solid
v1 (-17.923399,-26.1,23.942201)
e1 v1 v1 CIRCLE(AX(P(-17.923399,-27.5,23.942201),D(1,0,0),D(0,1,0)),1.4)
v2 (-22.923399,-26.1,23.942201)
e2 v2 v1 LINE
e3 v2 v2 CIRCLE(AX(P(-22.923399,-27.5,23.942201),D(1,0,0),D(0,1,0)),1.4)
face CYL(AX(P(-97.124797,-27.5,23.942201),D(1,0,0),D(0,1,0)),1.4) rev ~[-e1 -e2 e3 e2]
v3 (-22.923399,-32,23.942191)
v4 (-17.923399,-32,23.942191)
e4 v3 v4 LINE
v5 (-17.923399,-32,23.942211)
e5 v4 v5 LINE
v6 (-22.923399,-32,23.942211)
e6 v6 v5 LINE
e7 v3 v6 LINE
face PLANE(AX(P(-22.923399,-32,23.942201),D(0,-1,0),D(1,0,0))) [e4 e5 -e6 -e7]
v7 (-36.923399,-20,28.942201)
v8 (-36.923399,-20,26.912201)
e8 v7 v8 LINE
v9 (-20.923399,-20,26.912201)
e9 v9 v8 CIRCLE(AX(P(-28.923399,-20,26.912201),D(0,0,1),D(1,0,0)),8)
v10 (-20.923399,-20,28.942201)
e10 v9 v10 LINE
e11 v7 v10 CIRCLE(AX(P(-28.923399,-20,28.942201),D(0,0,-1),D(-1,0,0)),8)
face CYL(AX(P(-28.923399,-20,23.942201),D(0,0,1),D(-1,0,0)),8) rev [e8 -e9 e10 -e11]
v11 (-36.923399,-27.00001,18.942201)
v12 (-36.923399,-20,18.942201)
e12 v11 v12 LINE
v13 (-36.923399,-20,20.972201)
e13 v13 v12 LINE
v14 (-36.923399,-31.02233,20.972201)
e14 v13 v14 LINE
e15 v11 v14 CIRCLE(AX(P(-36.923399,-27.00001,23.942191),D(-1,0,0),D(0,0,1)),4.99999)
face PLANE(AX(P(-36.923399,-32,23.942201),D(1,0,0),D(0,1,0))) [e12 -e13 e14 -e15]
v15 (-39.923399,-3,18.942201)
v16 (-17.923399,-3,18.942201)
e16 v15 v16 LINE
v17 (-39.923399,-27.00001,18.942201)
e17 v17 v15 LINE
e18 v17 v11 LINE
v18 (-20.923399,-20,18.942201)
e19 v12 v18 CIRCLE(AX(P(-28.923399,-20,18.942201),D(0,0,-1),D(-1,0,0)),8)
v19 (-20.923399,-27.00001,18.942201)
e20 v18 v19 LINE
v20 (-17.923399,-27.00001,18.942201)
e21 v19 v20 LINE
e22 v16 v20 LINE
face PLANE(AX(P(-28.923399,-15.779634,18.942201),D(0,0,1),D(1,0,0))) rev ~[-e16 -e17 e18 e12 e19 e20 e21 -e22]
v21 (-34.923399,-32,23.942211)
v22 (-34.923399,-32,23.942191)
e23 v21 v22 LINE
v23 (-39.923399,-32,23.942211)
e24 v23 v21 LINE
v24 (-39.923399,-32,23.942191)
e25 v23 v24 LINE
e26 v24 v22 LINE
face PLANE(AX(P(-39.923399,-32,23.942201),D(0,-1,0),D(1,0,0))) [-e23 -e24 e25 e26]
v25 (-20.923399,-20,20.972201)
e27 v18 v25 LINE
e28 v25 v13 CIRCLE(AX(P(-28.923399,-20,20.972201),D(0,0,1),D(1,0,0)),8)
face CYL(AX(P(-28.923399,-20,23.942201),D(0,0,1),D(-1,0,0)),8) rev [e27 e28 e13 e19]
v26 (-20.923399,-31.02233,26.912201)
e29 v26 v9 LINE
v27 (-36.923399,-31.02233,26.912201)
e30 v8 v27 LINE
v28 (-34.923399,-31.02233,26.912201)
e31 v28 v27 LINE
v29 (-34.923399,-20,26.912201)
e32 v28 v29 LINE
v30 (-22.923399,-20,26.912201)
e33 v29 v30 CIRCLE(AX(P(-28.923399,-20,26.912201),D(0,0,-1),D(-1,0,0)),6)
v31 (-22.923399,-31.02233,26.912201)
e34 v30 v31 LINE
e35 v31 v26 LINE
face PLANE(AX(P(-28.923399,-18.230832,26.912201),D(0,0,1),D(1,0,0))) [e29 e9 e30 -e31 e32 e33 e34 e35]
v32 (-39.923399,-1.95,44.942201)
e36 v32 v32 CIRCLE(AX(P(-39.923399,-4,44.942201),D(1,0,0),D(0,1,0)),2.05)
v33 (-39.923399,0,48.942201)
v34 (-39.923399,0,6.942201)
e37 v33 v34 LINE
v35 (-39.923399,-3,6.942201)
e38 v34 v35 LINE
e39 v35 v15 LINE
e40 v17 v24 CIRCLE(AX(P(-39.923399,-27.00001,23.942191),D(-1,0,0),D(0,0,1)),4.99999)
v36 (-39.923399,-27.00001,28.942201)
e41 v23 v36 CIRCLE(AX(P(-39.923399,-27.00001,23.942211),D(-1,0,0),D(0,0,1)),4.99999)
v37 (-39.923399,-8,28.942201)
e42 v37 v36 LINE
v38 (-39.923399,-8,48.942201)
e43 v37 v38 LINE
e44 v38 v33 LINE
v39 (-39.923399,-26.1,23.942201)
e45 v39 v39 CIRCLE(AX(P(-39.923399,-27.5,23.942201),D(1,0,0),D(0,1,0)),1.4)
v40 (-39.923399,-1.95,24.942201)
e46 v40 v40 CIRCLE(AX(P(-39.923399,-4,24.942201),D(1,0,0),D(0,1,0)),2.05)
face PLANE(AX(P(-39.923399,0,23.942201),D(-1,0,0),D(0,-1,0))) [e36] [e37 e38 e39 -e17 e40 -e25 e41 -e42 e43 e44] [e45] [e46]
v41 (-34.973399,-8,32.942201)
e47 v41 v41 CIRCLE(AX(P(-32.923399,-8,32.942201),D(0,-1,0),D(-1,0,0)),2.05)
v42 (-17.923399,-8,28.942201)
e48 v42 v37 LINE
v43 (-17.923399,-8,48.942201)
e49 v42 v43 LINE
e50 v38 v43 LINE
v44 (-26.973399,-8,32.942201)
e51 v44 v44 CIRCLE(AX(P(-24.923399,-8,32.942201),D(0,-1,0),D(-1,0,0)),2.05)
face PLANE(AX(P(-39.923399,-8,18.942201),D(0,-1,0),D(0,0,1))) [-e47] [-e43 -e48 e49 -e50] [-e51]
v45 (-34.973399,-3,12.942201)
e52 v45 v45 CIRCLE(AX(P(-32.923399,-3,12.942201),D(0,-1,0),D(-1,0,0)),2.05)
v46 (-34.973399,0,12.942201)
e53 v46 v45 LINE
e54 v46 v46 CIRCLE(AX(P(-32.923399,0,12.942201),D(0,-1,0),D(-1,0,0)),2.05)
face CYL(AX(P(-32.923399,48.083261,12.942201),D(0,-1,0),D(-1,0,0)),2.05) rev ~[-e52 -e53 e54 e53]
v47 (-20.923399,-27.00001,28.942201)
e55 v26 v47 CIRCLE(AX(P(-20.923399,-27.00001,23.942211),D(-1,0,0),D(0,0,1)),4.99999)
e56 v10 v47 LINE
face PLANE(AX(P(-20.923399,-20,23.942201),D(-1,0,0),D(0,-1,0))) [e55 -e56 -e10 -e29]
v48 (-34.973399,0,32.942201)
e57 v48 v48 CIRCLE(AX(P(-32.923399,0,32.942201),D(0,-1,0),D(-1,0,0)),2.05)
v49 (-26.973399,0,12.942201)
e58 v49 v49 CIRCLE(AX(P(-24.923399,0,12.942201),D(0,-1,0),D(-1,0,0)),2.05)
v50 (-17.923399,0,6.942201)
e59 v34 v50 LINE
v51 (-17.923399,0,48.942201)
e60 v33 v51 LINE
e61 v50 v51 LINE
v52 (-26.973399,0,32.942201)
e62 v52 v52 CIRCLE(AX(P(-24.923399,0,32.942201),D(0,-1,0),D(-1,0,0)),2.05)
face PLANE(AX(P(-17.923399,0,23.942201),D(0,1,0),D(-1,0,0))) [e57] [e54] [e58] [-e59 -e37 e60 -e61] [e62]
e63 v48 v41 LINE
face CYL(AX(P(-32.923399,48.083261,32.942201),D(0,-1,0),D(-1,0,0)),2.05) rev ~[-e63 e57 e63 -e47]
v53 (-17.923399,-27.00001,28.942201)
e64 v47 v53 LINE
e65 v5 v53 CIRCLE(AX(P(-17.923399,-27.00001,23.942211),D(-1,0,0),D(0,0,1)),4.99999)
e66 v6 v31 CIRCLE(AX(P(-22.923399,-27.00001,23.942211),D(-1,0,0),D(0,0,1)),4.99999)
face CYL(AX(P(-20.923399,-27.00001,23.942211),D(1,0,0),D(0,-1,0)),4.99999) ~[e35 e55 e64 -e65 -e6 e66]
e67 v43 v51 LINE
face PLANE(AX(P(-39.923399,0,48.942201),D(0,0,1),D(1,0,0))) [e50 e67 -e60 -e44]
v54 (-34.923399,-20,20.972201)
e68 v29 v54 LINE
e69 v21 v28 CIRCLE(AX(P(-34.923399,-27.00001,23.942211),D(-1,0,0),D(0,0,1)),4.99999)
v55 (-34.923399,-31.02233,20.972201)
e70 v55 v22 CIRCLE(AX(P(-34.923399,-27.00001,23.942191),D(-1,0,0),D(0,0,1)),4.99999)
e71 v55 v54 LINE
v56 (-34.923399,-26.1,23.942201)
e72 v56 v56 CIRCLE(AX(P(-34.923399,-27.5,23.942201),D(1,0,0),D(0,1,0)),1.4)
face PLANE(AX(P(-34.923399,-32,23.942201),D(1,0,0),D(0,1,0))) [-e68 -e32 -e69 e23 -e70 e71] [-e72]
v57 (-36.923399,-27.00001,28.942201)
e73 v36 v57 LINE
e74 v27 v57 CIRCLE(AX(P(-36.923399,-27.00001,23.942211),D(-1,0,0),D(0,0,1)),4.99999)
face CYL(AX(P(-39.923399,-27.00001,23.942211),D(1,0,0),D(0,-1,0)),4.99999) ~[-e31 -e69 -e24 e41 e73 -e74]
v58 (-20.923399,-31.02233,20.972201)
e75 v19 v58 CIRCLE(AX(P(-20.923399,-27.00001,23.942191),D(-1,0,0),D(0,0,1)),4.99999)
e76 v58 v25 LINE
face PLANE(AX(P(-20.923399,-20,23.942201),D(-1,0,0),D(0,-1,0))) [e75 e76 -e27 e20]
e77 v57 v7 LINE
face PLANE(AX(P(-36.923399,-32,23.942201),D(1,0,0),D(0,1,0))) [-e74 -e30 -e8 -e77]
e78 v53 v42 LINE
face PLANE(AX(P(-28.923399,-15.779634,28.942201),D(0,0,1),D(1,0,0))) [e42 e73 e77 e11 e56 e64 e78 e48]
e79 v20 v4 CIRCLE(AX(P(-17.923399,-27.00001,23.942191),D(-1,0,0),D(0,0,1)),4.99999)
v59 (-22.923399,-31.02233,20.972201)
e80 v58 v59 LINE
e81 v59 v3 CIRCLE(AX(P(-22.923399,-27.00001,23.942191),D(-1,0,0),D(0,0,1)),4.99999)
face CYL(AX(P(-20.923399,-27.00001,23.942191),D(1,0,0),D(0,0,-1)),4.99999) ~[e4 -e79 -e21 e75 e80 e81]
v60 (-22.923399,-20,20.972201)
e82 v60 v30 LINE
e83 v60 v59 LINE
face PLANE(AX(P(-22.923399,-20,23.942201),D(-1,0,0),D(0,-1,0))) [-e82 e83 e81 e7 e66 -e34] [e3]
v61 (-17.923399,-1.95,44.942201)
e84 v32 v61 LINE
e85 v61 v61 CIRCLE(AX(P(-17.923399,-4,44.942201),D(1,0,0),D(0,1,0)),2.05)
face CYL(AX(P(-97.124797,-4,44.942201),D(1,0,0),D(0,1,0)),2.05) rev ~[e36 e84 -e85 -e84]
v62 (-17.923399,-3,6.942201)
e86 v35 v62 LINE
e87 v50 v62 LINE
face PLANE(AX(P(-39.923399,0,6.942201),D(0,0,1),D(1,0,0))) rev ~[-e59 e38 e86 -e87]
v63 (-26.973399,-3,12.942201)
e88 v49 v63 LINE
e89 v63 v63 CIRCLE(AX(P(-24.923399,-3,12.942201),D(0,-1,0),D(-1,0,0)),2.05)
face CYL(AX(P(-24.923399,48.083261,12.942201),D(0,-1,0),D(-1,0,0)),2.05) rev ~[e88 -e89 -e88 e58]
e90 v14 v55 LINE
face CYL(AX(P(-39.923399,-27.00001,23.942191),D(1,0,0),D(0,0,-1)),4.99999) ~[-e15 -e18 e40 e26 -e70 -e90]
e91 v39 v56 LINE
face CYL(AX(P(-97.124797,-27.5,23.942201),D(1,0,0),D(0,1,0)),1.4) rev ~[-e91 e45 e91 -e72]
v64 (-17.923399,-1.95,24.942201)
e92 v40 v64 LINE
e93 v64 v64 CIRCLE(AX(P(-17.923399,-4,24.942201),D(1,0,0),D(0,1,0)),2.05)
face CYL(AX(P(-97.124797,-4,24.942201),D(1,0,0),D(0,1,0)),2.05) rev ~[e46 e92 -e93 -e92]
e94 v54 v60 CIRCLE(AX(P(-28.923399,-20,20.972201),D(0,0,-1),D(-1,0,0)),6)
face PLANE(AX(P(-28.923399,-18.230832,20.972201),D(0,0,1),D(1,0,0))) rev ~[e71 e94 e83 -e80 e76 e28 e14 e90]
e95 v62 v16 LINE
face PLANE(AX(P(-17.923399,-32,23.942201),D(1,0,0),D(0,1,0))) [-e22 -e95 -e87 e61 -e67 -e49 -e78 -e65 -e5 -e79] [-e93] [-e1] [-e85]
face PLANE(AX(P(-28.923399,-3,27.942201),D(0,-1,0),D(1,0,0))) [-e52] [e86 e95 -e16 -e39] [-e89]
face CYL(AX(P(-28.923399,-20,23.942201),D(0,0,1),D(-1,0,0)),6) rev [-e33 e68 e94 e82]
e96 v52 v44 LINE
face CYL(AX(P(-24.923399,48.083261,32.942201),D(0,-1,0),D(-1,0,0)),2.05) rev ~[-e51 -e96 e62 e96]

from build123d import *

# Parameters (mm, degrees)
F0_W     = 22
F0_H     = 42
F1_DEPTH = 3
F2_W     = 3
F2_H     = 30
F2_W_2   = 5
F3_DEPTH = 22
F4_D     = 4.1
F7_DEPTH = 5
F8_DEPTH = 2.97
F9_R     = 4.99999
F11_D    = 4.1
F12_D    = 2.8


# Not quite as in the source:
# - a fillet or chamfer is up to 0.001 mm smaller than in the source, because OpenCascade refuses the exact size


with BuildPart() as f1:
    # F0 (on Front) → F1 (new body)
    with BuildSketch(Plane.XZ):
        with Locations((-28.9233987555, 27.9422005266)):
            Rectangle(F0_W, F0_H)
    extrude(amount=F1_DEPTH)

    # F2 (on face) → F3 (join)
    with BuildSketch(Plane(origin=(-39.9233987555, 0, 0), x_dir=(0, -1, 0), z_dir=(-1, 0, 0))):
        with Locations((1.5, 33.9422005266)):
            Rectangle(F2_W, F2_H)
        with Locations((5.5, 33.9422005266)):
            Rectangle(F2_W_2, F2_H)
    extrude(amount=-F3_DEPTH)

    # F4 (through all)
    with Locations(Plane(origin=(0, 0, 0), x_dir=(1, 0, 0), z_dir=(0, 1, 0))):
        with Locations((-24.9233987555, -12.9422005266), (-32.9233987555, -12.9422005266), (-32.9233987555, -32.9422005266), (-24.9233987555, -32.9422005266)):
            Hole(F4_D / 2)

    # F6 (on line) → F7 (join, symmetric)
    with BuildSketch(Plane.XY.offset(23.9422005266)):
        with BuildLine():
            ThreePointArc((-36.9233987555, -20), (-28.9233987555, -12), (-20.9233987555, -20))
            Line((-20.9233987555, -20), (-20.9233987555, -32))
            Line((-20.9233987555, -32), (-17.9233987555, -32))
            Line((-17.9233987555, -32), (-17.9233987555, 0))
            Line((-17.9233987555, 0), (-39.9233987555, 0))
            Line((-39.9233987555, 0), (-39.9233987555, -32))
            Line((-39.9233987555, -32), (-36.9233987555, -32))
            Line((-36.9233987555, -32), (-36.9233987555, -20))
        make_face()
    extrude(amount=F7_DEPTH, both=True)

    # F6 (on line) → F8 (join, symmetric)
    with BuildSketch(Plane.XY.offset(23.9422005266)):
        with BuildLine():
            ThreePointArc((-34.9233987555, -20), (-28.9233987555, -14), (-22.9233987555, -20))
            Line((-22.9233987555, -20), (-22.9233987555, -25.2915026221))
            ThreePointArc((-22.9233987555, -25.2915026221), (-21.4400839819, -22.8284271247), (-20.9233987555, -20))
            ThreePointArc((-20.9233987555, -20), (-28.9233987555, -12), (-36.9233987555, -20))
            ThreePointArc((-36.9233987555, -20), (-36.406713529, -22.8284271247), (-34.9233987555, -25.2915026221))
            Line((-34.9233987555, -25.2915026221), (-34.9233987555, -20))
        make_face()
        with BuildLine():
            Line((-34.9233987555, -32), (-34.9233987555, -25.2915026221))
            ThreePointArc((-34.9233987555, -25.2915026221), (-36.406713529, -22.8284271247), (-36.9233987555, -20))
            Line((-36.9233987555, -20), (-36.9233987555, -32))
            Line((-36.9233987555, -32), (-34.9233987555, -32))
        make_face()
        with BuildLine():
            ThreePointArc((-20.9233987555, -20), (-21.4400839819, -22.8284271247), (-22.9233987555, -25.2915026221))
            Line((-22.9233987555, -25.2915026221), (-22.9233987555, -32))
            Line((-22.9233987555, -32), (-20.9233987555, -32))
            Line((-20.9233987555, -32), (-20.9233987555, -20))
        make_face()
    extrude(amount=F8_DEPTH, both=True)

    # F9 (radius 5 in the source; OpenCascade refuses exactly that, so slightly less here)
    f9_edges = [f1.edges().sort_by_distance(p)[0] for p in [
        (-38.423399, -32, 28.942201),
        (-38.423399, -32, 18.942201),
        (-19.423399, -32, 18.942201),
        (-19.423399, -32, 28.942201),
    ]]
    fillet(f9_edges, radius=F9_R)

    # F11 (through all)
    with Locations(Plane(origin=(-39.9233987555, 0, 0), x_dir=(0, -1, 0), z_dir=(-1, 0, 0))):
        with Locations((4, 44.9422005266), (4, 24.9422005266)):
            Hole(F11_D / 2)

    # F12 (through all)
    with Locations(Plane(origin=(-39.9233987555, 0, 0), x_dir=(0, -1, 0), z_dir=(-1, 0, 0))):
        with Locations((27.5, 23.9422005266)):
            Hole(F12_D / 2)


solid = f1.part
